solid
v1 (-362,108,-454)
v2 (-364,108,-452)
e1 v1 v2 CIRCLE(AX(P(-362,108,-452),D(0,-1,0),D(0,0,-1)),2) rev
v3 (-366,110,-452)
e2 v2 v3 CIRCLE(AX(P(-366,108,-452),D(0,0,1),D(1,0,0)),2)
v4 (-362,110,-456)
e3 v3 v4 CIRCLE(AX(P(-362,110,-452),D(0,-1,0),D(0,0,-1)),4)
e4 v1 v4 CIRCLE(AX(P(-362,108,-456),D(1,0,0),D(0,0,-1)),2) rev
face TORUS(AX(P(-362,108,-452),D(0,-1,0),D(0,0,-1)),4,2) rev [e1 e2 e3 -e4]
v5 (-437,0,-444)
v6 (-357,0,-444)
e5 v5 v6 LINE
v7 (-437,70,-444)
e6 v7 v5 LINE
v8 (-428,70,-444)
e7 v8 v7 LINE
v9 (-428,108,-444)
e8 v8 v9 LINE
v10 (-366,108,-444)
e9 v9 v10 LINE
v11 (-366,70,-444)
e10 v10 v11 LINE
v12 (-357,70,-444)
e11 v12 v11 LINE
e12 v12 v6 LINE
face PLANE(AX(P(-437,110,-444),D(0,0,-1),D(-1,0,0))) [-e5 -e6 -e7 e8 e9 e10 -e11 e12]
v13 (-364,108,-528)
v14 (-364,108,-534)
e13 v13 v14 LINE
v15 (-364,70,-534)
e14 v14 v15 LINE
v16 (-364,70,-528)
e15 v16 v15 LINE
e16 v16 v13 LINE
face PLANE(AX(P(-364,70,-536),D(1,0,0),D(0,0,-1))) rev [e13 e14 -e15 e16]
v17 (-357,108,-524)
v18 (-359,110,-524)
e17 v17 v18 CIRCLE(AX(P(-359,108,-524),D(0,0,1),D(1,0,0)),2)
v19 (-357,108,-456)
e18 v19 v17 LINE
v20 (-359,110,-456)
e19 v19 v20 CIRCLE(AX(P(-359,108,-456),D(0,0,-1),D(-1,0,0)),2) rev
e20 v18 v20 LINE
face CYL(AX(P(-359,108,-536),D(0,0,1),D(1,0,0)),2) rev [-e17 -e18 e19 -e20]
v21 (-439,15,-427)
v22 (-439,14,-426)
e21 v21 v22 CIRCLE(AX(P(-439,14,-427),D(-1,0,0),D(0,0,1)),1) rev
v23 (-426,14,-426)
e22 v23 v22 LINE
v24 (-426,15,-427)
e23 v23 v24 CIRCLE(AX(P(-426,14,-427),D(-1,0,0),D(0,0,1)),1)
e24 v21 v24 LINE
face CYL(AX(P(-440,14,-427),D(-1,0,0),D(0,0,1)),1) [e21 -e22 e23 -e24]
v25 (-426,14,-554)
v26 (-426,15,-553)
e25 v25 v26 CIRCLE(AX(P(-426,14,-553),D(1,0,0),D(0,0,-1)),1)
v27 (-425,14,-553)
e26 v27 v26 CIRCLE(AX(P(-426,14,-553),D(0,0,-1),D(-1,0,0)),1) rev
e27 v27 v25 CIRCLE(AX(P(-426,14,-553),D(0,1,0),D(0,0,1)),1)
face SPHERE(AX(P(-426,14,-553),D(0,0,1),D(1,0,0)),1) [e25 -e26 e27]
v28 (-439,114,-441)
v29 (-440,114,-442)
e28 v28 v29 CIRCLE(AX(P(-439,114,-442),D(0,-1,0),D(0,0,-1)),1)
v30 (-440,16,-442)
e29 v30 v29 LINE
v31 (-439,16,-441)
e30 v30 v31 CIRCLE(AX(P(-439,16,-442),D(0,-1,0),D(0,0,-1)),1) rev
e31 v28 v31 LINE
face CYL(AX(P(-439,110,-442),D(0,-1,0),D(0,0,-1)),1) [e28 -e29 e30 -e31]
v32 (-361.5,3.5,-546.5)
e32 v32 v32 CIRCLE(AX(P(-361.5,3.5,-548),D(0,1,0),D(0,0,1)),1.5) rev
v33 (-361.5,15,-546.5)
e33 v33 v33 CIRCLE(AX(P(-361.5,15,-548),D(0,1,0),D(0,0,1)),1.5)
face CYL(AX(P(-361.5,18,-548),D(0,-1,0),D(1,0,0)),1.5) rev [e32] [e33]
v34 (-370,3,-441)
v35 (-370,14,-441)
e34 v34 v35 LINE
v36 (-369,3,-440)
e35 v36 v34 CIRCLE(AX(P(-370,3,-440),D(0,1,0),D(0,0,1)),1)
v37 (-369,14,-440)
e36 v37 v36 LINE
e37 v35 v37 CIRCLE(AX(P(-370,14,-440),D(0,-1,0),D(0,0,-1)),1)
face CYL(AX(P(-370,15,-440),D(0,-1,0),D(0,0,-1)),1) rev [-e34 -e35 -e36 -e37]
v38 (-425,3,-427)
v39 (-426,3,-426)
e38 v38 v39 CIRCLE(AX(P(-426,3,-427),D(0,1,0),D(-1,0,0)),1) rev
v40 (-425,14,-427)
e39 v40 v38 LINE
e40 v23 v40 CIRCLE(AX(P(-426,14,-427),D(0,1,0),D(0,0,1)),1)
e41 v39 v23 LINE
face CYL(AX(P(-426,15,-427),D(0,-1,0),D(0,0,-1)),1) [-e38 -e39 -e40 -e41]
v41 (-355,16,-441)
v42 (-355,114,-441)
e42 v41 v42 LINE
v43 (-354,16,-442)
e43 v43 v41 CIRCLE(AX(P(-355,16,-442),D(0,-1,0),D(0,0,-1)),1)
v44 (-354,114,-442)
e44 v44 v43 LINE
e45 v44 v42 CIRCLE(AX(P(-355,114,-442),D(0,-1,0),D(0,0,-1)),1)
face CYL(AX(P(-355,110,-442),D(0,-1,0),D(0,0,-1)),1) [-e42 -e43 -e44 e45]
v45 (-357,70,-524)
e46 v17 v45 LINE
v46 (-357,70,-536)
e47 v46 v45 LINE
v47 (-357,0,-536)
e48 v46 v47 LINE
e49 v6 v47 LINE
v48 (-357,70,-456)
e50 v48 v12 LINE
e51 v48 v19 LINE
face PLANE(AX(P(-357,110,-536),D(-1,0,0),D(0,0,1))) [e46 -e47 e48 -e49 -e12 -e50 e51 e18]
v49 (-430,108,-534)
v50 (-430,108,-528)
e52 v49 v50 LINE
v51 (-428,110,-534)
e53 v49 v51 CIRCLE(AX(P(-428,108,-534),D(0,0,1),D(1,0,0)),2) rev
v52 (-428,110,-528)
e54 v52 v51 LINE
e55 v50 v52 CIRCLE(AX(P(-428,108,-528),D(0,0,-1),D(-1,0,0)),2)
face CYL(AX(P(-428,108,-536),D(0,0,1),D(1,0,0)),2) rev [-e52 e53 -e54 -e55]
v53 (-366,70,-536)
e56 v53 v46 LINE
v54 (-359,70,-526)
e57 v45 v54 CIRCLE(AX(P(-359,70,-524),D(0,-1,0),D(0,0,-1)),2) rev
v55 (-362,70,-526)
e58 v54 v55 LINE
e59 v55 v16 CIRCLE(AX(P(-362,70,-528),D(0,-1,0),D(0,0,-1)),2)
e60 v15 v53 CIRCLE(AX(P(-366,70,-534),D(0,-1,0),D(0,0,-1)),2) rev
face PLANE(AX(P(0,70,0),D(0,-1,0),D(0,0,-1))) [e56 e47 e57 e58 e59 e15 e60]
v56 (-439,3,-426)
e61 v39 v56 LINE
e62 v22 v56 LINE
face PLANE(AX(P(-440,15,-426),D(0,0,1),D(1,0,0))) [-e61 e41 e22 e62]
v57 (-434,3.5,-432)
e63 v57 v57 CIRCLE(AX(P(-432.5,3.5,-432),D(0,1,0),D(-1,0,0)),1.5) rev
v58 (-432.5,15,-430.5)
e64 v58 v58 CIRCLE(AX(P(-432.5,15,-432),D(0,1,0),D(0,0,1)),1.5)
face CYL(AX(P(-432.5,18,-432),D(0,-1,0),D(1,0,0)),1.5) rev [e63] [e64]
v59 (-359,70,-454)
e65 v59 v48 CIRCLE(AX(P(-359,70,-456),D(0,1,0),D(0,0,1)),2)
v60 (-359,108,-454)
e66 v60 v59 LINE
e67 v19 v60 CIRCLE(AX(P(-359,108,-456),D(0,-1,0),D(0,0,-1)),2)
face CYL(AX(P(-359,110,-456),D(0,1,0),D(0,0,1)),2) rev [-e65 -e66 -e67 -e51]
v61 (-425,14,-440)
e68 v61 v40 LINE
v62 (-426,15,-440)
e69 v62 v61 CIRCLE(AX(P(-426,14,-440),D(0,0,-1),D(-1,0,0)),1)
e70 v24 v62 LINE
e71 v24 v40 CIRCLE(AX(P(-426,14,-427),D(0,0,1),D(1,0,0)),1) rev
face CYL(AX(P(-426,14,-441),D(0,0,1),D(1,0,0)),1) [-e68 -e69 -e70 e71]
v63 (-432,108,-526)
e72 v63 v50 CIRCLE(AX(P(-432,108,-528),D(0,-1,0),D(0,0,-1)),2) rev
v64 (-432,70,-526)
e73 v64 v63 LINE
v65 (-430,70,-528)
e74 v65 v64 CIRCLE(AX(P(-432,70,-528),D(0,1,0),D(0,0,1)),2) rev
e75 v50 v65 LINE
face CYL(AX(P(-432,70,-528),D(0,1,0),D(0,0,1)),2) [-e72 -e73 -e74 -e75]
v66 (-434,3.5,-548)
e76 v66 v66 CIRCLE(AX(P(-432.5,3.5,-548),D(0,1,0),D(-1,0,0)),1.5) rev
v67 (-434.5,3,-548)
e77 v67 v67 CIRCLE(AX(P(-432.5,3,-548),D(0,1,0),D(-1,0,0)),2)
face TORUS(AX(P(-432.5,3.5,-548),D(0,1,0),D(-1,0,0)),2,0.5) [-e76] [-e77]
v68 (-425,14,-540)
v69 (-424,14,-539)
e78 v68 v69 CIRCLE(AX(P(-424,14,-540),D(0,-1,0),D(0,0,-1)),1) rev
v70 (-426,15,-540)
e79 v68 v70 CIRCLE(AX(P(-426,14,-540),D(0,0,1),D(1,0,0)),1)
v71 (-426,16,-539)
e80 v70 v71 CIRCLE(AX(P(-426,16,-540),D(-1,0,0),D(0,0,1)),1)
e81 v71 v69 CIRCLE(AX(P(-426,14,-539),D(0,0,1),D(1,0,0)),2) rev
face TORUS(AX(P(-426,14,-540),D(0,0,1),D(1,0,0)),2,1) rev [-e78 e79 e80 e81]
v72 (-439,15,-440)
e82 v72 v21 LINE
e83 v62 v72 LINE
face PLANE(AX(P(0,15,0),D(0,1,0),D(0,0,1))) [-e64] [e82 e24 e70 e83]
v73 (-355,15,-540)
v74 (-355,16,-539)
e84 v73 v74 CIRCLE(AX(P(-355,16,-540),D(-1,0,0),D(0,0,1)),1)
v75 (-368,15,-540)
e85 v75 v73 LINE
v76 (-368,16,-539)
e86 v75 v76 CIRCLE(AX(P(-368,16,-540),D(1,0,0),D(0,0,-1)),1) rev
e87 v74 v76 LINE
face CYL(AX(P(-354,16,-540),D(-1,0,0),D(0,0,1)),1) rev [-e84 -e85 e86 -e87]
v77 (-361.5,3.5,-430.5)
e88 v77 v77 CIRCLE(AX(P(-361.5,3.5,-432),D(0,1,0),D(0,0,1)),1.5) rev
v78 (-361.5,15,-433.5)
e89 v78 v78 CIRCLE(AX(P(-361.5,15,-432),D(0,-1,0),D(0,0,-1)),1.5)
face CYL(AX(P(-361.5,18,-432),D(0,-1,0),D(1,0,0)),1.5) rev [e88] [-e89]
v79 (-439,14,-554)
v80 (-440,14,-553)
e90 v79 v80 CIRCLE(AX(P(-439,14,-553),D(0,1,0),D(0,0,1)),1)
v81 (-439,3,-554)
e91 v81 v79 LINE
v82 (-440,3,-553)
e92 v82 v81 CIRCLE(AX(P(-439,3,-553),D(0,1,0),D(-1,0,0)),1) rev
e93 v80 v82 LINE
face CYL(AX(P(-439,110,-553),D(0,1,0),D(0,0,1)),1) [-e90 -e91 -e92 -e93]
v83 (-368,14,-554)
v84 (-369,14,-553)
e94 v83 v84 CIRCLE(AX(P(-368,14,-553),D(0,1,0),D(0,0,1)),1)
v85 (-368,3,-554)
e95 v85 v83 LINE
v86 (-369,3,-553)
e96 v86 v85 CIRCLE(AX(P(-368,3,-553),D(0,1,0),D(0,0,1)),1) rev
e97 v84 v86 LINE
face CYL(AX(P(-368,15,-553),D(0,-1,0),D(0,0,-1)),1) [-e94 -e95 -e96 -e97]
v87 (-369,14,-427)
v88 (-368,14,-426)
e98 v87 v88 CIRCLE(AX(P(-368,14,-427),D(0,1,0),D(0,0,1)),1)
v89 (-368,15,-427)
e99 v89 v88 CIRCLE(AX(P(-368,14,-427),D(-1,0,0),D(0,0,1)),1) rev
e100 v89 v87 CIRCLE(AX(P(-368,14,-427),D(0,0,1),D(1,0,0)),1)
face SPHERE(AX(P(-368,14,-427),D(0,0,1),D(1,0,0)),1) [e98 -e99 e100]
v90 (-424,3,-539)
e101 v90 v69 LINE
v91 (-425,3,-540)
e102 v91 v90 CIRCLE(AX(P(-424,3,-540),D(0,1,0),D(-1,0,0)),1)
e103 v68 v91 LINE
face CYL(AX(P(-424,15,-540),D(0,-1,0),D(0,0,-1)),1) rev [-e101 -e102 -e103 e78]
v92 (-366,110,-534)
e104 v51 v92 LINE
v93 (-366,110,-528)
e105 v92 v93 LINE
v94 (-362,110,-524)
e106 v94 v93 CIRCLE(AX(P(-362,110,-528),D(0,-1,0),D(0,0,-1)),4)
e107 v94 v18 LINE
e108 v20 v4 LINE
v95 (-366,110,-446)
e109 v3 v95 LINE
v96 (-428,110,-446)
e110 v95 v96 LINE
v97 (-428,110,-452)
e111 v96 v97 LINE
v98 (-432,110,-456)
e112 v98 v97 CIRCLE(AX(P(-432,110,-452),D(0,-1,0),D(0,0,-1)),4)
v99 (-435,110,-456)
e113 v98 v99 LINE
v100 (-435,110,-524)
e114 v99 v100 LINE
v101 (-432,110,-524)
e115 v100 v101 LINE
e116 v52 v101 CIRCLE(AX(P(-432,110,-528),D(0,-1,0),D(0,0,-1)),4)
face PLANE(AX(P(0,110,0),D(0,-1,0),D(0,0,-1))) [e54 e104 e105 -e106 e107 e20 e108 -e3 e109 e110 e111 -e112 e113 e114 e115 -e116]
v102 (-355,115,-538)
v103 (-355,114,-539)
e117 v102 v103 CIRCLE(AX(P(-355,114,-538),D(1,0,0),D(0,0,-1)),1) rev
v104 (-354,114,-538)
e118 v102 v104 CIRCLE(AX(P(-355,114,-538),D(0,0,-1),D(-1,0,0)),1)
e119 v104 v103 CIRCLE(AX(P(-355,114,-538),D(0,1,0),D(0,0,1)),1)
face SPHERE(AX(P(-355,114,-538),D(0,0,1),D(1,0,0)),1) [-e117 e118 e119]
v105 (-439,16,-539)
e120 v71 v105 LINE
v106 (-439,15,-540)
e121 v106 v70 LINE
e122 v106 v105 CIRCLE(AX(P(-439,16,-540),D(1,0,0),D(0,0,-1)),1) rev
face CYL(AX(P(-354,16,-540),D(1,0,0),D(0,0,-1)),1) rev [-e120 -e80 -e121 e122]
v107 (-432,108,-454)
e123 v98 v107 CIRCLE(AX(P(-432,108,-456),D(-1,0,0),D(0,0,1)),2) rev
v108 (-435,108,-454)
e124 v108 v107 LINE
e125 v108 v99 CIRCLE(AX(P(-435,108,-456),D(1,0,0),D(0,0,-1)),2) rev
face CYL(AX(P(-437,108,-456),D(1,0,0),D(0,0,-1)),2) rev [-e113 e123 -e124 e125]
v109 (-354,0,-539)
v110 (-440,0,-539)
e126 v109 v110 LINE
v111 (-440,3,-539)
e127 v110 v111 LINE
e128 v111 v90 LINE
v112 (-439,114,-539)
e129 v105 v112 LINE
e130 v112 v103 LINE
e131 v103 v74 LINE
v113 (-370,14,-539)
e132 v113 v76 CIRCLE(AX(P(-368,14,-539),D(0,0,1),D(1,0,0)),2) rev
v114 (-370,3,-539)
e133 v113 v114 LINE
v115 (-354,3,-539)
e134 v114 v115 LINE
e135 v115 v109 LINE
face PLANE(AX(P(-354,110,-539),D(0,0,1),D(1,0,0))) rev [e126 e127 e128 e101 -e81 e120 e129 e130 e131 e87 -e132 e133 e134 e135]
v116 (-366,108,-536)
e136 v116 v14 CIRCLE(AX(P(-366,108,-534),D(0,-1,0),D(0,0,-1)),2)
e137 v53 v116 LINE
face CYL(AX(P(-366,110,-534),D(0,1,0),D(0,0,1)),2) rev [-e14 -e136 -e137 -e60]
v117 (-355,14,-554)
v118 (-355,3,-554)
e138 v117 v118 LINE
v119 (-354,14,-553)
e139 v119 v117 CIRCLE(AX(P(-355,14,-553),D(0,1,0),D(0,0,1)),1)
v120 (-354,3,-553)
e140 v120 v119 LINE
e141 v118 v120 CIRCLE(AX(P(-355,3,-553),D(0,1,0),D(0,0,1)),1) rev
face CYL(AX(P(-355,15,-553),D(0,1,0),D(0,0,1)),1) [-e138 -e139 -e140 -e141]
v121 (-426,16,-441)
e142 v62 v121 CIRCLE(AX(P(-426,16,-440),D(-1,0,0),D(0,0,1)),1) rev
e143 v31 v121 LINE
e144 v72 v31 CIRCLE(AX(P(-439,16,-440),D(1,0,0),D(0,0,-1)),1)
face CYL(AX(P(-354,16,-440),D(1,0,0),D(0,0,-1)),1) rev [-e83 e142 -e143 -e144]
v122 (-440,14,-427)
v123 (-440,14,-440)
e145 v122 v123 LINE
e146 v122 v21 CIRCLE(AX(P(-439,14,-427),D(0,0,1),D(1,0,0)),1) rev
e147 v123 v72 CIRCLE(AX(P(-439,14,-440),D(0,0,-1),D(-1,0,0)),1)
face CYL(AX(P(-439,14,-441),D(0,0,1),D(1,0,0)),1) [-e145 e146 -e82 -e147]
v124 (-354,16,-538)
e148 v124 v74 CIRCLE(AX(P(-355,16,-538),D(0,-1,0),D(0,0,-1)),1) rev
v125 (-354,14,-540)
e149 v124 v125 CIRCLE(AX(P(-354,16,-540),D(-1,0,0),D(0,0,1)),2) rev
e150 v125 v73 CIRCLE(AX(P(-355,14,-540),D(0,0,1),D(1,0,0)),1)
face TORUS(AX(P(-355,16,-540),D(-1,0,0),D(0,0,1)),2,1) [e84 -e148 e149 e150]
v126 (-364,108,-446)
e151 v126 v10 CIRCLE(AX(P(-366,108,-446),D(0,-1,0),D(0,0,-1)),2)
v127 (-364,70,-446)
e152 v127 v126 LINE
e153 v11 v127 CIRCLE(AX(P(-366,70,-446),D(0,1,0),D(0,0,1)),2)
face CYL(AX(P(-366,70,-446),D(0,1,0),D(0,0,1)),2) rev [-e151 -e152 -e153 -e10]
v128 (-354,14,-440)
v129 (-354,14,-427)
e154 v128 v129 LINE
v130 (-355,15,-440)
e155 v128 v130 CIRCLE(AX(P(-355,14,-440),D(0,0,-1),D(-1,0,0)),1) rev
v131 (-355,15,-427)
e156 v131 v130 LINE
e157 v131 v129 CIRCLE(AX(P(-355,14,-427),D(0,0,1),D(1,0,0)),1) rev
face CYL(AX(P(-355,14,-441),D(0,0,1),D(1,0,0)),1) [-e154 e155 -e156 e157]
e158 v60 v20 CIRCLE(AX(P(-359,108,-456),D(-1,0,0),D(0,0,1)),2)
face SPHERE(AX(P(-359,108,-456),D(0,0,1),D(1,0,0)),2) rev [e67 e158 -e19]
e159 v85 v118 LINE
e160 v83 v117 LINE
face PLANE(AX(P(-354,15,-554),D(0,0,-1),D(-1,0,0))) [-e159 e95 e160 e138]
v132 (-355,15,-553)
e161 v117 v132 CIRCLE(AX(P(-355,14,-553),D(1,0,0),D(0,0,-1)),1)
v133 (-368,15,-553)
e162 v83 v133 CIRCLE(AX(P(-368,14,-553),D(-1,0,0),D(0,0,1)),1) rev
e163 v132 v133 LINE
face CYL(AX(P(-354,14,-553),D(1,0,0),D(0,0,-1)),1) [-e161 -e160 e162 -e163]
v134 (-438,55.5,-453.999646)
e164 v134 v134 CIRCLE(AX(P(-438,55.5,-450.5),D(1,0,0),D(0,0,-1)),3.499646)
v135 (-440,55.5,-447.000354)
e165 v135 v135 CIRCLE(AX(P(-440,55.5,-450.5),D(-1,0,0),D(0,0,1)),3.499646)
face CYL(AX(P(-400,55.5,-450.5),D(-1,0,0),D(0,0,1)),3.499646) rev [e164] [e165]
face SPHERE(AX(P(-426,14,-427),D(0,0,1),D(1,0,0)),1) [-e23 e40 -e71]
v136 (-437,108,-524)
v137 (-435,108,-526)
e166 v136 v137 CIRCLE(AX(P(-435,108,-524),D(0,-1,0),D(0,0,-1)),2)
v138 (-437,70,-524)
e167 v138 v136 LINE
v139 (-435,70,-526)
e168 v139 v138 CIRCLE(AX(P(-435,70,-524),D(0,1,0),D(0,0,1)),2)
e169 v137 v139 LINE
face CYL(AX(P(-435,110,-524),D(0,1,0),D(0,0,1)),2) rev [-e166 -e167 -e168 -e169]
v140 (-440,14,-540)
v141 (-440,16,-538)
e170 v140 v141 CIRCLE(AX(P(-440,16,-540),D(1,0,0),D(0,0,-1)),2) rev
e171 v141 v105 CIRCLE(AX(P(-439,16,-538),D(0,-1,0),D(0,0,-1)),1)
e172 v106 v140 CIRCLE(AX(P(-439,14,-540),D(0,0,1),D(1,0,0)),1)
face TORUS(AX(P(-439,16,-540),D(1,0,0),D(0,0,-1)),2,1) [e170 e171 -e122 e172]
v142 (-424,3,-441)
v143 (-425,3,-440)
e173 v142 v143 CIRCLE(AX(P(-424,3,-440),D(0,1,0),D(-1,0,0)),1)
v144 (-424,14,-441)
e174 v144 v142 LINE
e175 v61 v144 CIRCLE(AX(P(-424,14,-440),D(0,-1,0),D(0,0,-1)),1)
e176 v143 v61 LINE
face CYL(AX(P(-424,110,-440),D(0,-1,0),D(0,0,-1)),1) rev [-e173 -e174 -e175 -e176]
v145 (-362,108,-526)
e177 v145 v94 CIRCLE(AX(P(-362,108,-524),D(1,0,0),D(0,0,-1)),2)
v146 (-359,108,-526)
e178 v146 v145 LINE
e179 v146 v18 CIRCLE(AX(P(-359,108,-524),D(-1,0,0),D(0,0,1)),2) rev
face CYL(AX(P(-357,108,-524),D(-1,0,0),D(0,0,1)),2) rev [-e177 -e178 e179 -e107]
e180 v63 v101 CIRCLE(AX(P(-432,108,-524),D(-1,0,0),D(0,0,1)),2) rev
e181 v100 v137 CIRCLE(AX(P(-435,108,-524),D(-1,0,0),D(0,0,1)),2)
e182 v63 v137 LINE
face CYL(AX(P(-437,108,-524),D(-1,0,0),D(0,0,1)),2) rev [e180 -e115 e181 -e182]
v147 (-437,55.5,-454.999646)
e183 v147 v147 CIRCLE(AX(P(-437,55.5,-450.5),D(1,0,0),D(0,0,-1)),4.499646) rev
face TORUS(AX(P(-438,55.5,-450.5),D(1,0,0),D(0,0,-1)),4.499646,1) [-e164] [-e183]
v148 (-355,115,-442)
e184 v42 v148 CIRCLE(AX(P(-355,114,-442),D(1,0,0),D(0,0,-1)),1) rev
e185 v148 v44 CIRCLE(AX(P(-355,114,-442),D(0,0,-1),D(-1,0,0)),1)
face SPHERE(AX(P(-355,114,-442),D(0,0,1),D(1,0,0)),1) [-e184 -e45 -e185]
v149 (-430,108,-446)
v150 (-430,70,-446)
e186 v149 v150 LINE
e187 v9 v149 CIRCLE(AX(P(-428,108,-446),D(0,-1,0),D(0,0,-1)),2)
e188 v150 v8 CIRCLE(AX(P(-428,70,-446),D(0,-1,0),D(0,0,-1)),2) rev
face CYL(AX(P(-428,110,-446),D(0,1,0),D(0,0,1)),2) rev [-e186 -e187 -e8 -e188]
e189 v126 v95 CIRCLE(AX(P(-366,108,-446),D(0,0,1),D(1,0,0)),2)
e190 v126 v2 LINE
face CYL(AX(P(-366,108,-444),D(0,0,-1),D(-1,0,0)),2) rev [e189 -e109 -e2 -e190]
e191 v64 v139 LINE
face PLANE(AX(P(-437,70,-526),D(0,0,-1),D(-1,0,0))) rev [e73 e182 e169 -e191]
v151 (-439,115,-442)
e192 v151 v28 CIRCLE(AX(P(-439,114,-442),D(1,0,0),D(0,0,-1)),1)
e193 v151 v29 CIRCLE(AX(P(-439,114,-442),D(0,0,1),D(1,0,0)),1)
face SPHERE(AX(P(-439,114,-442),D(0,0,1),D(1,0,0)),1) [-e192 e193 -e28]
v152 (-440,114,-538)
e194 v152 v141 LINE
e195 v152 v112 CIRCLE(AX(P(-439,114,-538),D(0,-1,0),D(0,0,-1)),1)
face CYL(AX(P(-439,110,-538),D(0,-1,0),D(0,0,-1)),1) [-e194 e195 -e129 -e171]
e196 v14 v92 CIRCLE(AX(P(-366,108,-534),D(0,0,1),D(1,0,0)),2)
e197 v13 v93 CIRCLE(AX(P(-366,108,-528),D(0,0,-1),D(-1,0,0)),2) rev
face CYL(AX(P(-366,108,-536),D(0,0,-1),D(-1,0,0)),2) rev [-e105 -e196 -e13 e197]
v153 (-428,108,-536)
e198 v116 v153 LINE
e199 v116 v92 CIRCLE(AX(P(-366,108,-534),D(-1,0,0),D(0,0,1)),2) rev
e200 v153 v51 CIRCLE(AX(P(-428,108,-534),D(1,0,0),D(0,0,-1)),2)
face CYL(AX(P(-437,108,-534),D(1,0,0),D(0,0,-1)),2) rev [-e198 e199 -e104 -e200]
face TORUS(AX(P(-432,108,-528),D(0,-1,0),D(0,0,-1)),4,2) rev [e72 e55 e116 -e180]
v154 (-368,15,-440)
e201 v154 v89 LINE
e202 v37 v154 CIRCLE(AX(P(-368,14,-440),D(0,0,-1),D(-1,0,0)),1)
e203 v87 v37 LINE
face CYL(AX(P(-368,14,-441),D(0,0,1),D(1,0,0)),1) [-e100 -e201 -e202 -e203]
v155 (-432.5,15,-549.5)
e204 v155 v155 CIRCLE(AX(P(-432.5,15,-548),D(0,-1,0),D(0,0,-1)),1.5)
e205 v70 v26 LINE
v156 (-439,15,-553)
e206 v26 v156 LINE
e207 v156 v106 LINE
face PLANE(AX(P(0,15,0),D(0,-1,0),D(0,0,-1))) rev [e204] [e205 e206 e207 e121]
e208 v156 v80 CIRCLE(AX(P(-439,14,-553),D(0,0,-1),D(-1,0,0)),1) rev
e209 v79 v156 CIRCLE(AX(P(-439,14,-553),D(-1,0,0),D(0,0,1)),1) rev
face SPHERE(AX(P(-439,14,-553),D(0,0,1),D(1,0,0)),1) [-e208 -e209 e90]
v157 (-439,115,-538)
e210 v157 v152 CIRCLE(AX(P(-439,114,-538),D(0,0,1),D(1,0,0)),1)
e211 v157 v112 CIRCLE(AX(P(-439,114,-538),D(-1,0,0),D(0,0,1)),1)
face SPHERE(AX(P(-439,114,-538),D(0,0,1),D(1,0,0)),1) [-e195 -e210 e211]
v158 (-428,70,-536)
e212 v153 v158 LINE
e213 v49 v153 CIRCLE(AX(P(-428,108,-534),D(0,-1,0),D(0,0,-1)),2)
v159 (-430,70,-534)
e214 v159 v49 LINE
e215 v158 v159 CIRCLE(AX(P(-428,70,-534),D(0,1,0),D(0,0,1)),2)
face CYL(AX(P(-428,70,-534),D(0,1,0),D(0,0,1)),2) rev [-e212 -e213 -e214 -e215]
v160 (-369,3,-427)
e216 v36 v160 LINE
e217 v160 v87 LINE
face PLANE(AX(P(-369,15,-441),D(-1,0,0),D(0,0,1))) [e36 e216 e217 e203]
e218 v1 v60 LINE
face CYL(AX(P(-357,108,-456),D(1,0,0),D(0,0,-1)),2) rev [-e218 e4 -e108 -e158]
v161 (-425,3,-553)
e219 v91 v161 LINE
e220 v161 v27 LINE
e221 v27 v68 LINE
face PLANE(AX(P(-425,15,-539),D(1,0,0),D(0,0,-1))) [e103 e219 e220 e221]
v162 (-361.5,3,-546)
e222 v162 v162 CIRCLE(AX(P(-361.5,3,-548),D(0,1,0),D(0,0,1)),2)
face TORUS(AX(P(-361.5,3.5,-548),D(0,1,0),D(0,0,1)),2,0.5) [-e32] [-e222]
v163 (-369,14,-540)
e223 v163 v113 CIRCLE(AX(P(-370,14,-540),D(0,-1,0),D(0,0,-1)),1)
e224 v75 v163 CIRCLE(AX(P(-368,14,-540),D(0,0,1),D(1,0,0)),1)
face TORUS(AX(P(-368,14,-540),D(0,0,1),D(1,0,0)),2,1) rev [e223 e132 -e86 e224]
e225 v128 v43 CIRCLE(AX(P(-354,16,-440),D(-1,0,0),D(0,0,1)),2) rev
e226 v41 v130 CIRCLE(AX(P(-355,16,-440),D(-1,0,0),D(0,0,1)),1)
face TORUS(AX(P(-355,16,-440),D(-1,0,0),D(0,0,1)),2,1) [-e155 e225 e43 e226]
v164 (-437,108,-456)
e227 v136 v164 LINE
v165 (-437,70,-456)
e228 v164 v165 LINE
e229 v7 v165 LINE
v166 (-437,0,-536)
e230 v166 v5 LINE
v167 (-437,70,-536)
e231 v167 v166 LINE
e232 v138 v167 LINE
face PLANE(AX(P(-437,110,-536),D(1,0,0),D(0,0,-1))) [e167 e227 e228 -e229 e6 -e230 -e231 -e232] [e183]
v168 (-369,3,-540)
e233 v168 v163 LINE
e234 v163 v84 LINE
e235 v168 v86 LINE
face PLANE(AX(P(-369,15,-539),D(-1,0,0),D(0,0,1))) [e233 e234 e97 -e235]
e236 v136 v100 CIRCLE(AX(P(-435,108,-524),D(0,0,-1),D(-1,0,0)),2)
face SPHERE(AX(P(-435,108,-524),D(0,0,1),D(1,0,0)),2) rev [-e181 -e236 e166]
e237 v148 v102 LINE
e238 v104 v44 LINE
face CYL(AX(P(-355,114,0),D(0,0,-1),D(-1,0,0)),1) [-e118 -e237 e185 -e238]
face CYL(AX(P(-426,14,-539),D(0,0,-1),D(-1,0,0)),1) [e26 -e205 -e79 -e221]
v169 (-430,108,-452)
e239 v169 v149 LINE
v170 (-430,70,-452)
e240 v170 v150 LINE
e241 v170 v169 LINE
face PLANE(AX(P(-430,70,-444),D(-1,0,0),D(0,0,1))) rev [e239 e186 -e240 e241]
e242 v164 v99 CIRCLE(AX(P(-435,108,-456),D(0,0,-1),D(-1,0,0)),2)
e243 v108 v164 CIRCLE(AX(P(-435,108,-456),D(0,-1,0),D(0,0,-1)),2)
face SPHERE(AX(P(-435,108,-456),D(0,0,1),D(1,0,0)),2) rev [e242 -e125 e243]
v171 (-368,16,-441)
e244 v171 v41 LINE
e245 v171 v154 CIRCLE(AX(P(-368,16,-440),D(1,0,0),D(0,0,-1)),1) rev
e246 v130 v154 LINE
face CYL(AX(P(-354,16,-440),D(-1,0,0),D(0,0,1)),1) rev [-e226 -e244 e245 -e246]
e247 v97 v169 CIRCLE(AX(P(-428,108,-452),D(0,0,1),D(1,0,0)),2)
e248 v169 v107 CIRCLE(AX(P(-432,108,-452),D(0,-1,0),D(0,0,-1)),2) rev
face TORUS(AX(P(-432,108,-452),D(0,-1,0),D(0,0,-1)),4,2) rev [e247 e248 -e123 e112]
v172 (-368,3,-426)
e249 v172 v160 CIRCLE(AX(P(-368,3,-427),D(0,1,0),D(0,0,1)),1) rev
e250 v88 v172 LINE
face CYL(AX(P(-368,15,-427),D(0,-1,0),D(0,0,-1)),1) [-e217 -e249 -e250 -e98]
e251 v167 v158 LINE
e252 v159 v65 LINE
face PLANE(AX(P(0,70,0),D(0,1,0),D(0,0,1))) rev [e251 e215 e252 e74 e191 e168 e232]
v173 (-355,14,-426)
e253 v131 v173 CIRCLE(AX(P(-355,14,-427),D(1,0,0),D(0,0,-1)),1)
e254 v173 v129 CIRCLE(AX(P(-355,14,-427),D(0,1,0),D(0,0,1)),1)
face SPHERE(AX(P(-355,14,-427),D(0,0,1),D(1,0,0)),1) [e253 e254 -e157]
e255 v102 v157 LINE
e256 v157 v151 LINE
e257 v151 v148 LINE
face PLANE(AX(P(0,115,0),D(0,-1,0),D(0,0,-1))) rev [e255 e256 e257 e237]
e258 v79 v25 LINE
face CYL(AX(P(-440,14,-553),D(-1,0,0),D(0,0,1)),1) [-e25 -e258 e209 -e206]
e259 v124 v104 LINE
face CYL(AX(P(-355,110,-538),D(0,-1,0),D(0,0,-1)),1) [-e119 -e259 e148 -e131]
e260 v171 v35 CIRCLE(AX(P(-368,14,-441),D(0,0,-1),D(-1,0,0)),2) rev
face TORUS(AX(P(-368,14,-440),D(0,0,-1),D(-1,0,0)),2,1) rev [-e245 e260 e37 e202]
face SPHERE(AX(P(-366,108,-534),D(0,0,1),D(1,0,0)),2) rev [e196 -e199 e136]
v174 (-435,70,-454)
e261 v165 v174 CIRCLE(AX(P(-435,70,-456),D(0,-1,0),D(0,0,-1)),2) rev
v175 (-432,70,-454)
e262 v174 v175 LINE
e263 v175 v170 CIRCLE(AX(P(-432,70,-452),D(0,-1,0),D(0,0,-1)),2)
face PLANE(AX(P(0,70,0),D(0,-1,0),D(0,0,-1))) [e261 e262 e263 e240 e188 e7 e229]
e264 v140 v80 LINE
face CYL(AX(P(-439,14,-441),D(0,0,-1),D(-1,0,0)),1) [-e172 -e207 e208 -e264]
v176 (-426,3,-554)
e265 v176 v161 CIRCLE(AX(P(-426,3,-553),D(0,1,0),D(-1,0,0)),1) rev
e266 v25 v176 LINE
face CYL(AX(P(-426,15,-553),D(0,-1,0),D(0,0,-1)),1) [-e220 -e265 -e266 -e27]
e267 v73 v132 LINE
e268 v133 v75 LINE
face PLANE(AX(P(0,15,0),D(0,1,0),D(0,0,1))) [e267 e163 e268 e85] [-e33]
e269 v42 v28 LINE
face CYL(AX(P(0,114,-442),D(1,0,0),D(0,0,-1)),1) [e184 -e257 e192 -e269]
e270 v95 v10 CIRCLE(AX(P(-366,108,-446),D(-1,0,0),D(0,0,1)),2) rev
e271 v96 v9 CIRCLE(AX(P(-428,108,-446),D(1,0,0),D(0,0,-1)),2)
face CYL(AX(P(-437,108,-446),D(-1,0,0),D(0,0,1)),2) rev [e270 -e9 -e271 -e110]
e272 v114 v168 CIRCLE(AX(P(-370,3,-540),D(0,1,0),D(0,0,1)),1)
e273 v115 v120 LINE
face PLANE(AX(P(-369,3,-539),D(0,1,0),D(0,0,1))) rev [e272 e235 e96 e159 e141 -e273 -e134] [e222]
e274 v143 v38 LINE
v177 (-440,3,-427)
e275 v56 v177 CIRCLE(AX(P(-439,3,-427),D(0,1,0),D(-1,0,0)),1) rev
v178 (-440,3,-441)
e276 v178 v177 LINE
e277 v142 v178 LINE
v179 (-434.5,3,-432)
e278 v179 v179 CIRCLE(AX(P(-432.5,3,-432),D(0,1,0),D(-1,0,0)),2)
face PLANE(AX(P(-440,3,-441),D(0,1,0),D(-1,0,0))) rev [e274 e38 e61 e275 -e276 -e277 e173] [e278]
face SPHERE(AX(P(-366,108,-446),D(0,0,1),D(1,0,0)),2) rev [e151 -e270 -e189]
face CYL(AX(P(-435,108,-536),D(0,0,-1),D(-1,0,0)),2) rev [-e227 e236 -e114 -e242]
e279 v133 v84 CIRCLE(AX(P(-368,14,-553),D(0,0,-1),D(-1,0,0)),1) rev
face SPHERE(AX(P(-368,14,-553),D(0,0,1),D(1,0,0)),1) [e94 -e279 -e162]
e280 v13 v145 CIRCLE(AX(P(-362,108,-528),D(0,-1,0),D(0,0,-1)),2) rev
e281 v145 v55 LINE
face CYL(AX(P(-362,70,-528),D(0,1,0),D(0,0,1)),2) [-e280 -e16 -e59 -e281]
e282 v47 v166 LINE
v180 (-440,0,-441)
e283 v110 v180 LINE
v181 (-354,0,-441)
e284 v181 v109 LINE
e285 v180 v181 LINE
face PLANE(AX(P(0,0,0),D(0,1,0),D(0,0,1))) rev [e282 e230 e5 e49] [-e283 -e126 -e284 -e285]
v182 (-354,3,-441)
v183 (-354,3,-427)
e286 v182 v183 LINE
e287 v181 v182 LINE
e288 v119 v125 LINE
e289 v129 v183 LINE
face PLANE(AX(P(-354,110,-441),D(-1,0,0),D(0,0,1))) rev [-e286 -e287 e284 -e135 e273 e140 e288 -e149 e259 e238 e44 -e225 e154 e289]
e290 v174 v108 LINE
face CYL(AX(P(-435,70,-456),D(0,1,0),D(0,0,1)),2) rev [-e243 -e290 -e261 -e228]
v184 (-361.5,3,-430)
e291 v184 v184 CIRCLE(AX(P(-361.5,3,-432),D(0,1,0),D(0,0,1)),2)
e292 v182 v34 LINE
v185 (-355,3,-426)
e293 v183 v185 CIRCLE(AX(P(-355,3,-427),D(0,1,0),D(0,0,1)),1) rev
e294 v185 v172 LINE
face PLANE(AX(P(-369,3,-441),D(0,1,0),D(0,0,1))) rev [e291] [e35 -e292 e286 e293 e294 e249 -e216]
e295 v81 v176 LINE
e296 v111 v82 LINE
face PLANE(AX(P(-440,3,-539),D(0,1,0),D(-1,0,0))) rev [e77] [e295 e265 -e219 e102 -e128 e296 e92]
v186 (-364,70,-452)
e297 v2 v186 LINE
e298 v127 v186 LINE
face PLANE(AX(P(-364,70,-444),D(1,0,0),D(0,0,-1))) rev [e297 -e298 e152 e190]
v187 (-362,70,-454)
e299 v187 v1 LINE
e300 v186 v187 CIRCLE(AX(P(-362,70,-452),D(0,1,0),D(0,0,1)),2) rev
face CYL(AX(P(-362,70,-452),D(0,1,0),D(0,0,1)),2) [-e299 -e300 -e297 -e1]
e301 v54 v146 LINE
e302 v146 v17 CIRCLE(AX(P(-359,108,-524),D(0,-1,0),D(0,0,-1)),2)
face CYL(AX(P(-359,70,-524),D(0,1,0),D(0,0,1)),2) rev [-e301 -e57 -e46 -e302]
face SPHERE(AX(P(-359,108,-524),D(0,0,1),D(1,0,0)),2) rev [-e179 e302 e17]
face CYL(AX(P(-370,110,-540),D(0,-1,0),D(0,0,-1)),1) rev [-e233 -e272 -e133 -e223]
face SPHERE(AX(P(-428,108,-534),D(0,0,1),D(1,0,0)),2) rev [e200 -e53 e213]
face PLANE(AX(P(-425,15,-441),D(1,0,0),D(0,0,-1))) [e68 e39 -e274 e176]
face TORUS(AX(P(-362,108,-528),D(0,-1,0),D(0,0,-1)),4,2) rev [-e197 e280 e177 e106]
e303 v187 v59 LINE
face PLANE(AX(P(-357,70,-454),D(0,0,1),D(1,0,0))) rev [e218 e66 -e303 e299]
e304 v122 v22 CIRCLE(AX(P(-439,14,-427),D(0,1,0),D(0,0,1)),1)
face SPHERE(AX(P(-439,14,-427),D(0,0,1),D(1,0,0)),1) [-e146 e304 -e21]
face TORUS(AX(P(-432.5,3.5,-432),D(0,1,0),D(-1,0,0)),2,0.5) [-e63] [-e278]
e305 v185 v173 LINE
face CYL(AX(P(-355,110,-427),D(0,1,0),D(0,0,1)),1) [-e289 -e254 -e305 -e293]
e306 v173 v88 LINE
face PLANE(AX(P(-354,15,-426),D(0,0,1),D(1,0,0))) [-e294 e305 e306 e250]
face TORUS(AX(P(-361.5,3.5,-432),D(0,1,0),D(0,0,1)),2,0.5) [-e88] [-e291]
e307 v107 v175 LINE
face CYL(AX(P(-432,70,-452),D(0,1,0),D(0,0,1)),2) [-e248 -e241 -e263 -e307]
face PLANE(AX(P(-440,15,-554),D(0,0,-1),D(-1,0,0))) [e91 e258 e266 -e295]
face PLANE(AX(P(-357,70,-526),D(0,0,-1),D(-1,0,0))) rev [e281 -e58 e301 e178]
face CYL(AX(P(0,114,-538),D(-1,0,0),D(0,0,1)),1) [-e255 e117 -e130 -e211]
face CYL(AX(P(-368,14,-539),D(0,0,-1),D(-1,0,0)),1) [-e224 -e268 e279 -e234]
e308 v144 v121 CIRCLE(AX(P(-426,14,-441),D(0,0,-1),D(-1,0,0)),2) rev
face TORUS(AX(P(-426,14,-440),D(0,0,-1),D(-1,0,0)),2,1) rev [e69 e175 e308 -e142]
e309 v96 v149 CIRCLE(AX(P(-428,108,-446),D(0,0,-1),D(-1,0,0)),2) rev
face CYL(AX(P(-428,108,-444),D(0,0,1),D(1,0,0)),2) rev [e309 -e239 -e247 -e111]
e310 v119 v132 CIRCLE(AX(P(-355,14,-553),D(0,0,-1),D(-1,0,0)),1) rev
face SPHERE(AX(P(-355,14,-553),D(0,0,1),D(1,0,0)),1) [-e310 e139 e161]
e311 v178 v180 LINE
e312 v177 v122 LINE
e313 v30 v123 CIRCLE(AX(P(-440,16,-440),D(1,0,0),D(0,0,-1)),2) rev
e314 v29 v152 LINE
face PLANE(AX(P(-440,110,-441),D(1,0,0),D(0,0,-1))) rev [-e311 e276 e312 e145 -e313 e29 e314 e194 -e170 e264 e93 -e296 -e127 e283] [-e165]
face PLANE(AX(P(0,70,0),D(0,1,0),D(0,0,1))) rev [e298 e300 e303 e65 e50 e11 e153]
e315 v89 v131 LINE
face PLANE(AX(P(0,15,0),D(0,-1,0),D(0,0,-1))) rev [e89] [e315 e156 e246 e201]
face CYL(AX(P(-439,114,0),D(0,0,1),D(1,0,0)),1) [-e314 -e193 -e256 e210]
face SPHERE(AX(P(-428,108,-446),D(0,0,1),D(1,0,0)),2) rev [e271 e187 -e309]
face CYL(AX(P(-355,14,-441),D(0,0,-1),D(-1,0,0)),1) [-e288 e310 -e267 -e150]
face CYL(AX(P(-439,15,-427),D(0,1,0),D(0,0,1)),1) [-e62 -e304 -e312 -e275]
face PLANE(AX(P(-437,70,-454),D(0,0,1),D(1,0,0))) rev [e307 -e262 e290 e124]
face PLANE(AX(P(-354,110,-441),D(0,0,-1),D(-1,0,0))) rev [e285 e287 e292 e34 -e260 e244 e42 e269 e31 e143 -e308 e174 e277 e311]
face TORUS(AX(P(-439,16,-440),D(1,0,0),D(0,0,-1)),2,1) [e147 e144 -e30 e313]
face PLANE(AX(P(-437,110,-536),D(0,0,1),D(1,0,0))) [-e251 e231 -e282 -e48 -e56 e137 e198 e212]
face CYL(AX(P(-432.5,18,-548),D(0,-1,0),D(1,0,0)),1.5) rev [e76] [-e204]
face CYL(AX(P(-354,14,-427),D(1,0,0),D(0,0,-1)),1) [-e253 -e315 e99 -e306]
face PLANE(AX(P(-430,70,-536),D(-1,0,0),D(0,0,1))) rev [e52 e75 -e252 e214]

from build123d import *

# Parameters (mm, degrees)
ESBO_O1_W                = 86
ESBO_O1_H                = 98
ESBO_O1_W_2              = 80
ESBO_O1_H_2              = 92
RESSALTO_EXTRUS_O1_DEPTH = 110
ESBO_O2_W                = 86
ESBO_O2_H                = 98
RESSALTO_EXTRUS_O2_DEPTH = 5
ESBO_O3_W                = 7
ESBO_O3_H                = 10
RESSALTO_EXTRUS_O3_DEPTH = 40
ESBO_O4_R                = 3.499646081
CORTE_EXTRUS_O1_DEPTH    = 40
FILETE1_R                = 1
FILETE2_R                = 2
FILETE3_R                = 2
ESBO_O5_W                = 15
ESBO_O5_H                = 15
RESSALTO_EXTRUS_O4_DEPTH = 15
ESBO_O7_W                = 15
ESBO_O7_H                = 3
CORTE_EXTRUS_O2_DEPTH    = 15
ESBO_O8_W                = 15
ESBO_O8_H                = 3
CORTE_EXTRUS_O3_DEPTH    = 15
FILETE4_R                = 1
FILETE5_R                = 1
FILETE6_R                = 1
FILETE7_R                = 1
ESBO_O9_R                = 1.5
CORTE_EXTRUS_O4_DEPTH    = 15
FILETE8_R                = 0.5


with BuildPart() as part:
    # Esboço1 → Ressalto-extrusão1 (new body)
    with BuildSketch(Plane(origin=(0, 0, 0), x_dir=(1, 0, 0), z_dir=(0, 1, 0))):
        with Locations((-397, 490)):
            Rectangle(ESBO_O1_W, ESBO_O1_H)
        with Locations((-397, 490)):
            Rectangle(ESBO_O1_W_2, ESBO_O1_H_2, mode=Mode.SUBTRACT)
    extrude(amount=RESSALTO_EXTRUS_O1_DEPTH)

    # Esboço2 → Ressalto-extrusão2 (add)
    with BuildSketch(Plane(origin=(0, 110, 0), x_dir=(1, 0, 0), z_dir=(0, 1, 0))):
        with Locations((-397, 490)):
            Rectangle(ESBO_O2_W, ESBO_O2_H)
    extrude(amount=RESSALTO_EXTRUS_O2_DEPTH)

    # Esboço3 → Ressalto-extrusão3 (add)
    with BuildSketch(Plane.XZ.offset(-110)):
        with Locations((-433.5, -449)):
            Rectangle(ESBO_O3_W, ESBO_O3_H)
        with Locations((-360.5, -449)):
            Rectangle(ESBO_O3_W, ESBO_O3_H)
        with Locations((-360.5, -531)):
            Rectangle(ESBO_O3_W, ESBO_O3_H)
        with Locations((-433.5, -531)):
            Rectangle(ESBO_O3_W, ESBO_O3_H)
    extrude(amount=RESSALTO_EXTRUS_O3_DEPTH)

    # Esboço4 → Corte-extrusão1 (cut)
    with BuildSketch(Plane.ZY.offset(440)):
        with Locations((-450.5, 55.5)):
            Circle(ESBO_O4_R)
    extrude(amount=-CORTE_EXTRUS_O1_DEPTH, mode=Mode.SUBTRACT)

    # Filete1
    filete1_edges = [part.edges().sort_by_distance(p)[0] for p in [
        (-437, 55.5, -453.999646081),
    ]]
    fillet(filete1_edges, radius=FILETE1_R)

    # Filete2
    filete2_edges = [part.edges().sort_by_distance(p)[0] for p in [
        (-397, 110, -444),
        (-433.5, 110, -454),
        (-437, 90, -454),
        (-430, 110, -449),
        (-430, 90, -454),
        (-430, 90, -444),
        (-437, 110, -490),
    ]]
    fillet(filete2_edges, radius=FILETE2_R)

    # Filete3
    filete3_edges = [part.edges().sort_by_distance(p)[0] for p in [
        (-364, 110, -450),
        (-436.414213562, 109.414213562, -526),
        (-364, 109.414213562, -444.585786438),
        (-357, 110, -490),
        (-357, 90, -454),
        (-364, 89, -444),
        (-360.5, 110, -454),
        (-364, 90, -454),
        (-397, 110, -536),
        (-360.5, 110, -526),
        (-357, 90, -526),
        (-364, 110, -531),
        (-364, 90, -526),
        (-364, 90, -536),
        (-437, 89, -526),
        (-430, 110, -531),
        (-430, 90, -536),
        (-432.5, 110, -526),
        (-430, 90, -526),
    ]]
    fillet(filete3_edges, radius=FILETE3_R)

    # Esboço5 → Ressalto-extrusão4 (add)
    with BuildSketch(Plane.XZ):
        with Locations((-432.5, -433.5)):
            Rectangle(ESBO_O5_W, ESBO_O5_H)
        with Locations((-361.5, -433.5)):
            Rectangle(ESBO_O5_W, ESBO_O5_H)
        with Locations((-432.5, -546.5)):
            Rectangle(ESBO_O5_W, ESBO_O5_H)
        with Locations((-361.5, -546.5)):
            Rectangle(ESBO_O5_W, ESBO_O5_H)
    extrude(amount=-RESSALTO_EXTRUS_O4_DEPTH)

    # Esboço7 → Corte-extrusão2 (cut)
    with BuildSketch(Plane(origin=(0, 0, -554), x_dir=(-1, 0, 0), z_dir=(0, 0, -1))):
        with Locations((432.5, 1.5)):
            Rectangle(ESBO_O7_W, ESBO_O7_H)
        with Locations((361.5, 1.5)):
            Rectangle(ESBO_O7_W, ESBO_O7_H)
    extrude(amount=-CORTE_EXTRUS_O2_DEPTH, mode=Mode.SUBTRACT)

    # Esboço8 → Corte-extrusão3 (cut)
    with BuildSketch(Plane.XY.offset(-426)):
        with Locations((-432.5, 1.5)):
            Rectangle(ESBO_O8_W, ESBO_O8_H)
        with Locations((-361.5, 1.5)):
            Rectangle(ESBO_O8_W, ESBO_O8_H)
    extrude(amount=-CORTE_EXTRUS_O3_DEPTH, mode=Mode.SUBTRACT)

    # Filete4
    filete4_edges = [part.edges().sort_by_distance(p)[0] for p in [
        (-440, 15, -433.5),
        (-432.5, 15, -426),
        (-425, 15, -433.5),
        (-432.5, 15, -441),
        (-425, 9, -441),
        (-440, 65, -441),
    ]]
    fillet(filete4_edges, radius=FILETE4_R)

    # Filete5
    # the kernel refuses this fillet: 1 mm, written as the material it takes off along each edge
    with BuildSketch(Plane(origin=(-426, 14, -427), x_dir=(0, 0, 1), z_dir=(1, 0, 0))) as filete5_piece_1_section:
        Polygon((0, 0), (FILETE5_R, 0), (FILETE5_R, -FILETE5_R), (0, -FILETE5_R), align=None)
    filete5_piece_1 = extrude(amount=FILETE5_R, mode=Mode.PRIVATE)
    filete5_piece_1 = filete5_piece_1 - Plane(origin=(-426, 14, -427), x_dir=(0, -0.7071067811865475, -0.7071067811865475), z_dir=(1, 0, 0)) * Sphere(FILETE5_R, mode=Mode.PRIVATE)
    add(filete5_piece_1, mode=Mode.SUBTRACT)
    with BuildSketch(Plane(origin=(-439, 14, -427), x_dir=(0, 0, 1), z_dir=(-1, 0, 0))) as filete5_piece_2_section:
        Polygon((0, 0), (FILETE5_R, 0), (FILETE5_R, FILETE5_R), (0, FILETE5_R), align=None)
    filete5_piece_2 = extrude(amount=FILETE5_R, mode=Mode.PRIVATE)
    filete5_piece_2 = filete5_piece_2 - Plane(origin=(-439, 14, -427), x_dir=(0, -0.7071067811865475, -0.7071067811865475), z_dir=(-1, 0, 0)) * Sphere(FILETE5_R, mode=Mode.PRIVATE)
    add(filete5_piece_2, mode=Mode.SUBTRACT)
    with BuildSketch(Plane(origin=(-440, 0.5, -426), x_dir=(0, 0, -1), z_dir=(0, 1, 0))) as filete5_piece_3:
        with BuildLine():
            CenterArc((FILETE5_R, -FILETE5_R), FILETE5_R, 90, 90)
            Line((0, -FILETE5_R), (0, 0))
            Line((0, 0), (FILETE5_R, 0))
        make_face()
    extrude(amount=13.5, mode=Mode.SUBTRACT)
    with BuildSketch(Plane(origin=(-425, 0.5, -426), x_dir=(0, 0, -1), z_dir=(0, 1, 0))) as filete5_piece_4:
        with BuildLine():
            CenterArc((FILETE5_R, FILETE5_R), FILETE5_R, 180, 90)
            Line((0, FILETE5_R), (0, 0))
            Line((0, 0), (FILETE5_R, 0))
        make_face()
    extrude(amount=13.5, mode=Mode.SUBTRACT)

    # Filete6
    filete6_edges = [part.edges().sort_by_distance(p)[0] for p in [
        (-354, 15, -433.5),
        (-361.5, 15, -441),
        (-440, 115, -490.5),
        (-439.707106781, 115, -441.292893219),
        (-396.5, 115, -441),
        (-354, 65, -441),
        (-361.5, 15, -426),
        (-369, 15, -433.5),
        (-354, 9, -426),
        (-369, 9, -426),
        (-369, 9, -441),
    ]]
    fillet(filete6_edges, radius=FILETE6_R)

    # Filete7
    # the kernel refuses this fillet: 1 mm, written as the material it takes off along each edge
    with BuildSketch(Plane(origin=(-355, 114, -442), x_dir=(1, 0, 0), z_dir=(0, 1, 0))) as filete7_piece_1_section:
        Polygon((0, 0), (FILETE7_R, 0), (FILETE7_R, -FILETE7_R), (0, -FILETE7_R), align=None)
    filete7_piece_1 = extrude(amount=FILETE7_R, mode=Mode.PRIVATE)
    filete7_piece_1 = filete7_piece_1 - Plane(origin=(-355, 114, -442), x_dir=(-0.7071067811865475, 0, -0.7071067811865475), z_dir=(0, 1, 0)) * Sphere(FILETE7_R, mode=Mode.PRIVATE)
    add(filete7_piece_1, mode=Mode.SUBTRACT)
    with BuildSketch(Plane(origin=(-426, 14, -553), x_dir=(0, 0, -1), z_dir=(1, 0, 0))) as filete7_piece_2_section:
        Polygon((0, 0), (FILETE7_R, 0), (FILETE7_R, FILETE7_R), (0, FILETE7_R), align=None)
    filete7_piece_2 = extrude(amount=FILETE7_R, mode=Mode.PRIVATE)
    filete7_piece_2 = filete7_piece_2 - Plane(origin=(-426, 14, -553), x_dir=(0, -0.7071067811865475, 0.7071067811865475), z_dir=(1, 0, 0)) * Sphere(FILETE7_R, mode=Mode.PRIVATE)
    add(filete7_piece_2, mode=Mode.SUBTRACT)
    with BuildSketch(Plane(origin=(-368, 14, -553), x_dir=(-1, 0, 0), z_dir=(0, 1, 0))) as filete7_piece_3_section:
        Polygon((0, 0), (FILETE7_R, 0), (FILETE7_R, -FILETE7_R), (0, -FILETE7_R), align=None)
    filete7_piece_3 = extrude(amount=FILETE7_R, mode=Mode.PRIVATE)
    filete7_piece_3 = filete7_piece_3 - Plane(origin=(-368, 14, -553), x_dir=(0.7071067811865475, 0, 0.7071067811865475), z_dir=(0, 1, 0)) * Sphere(FILETE7_R, mode=Mode.PRIVATE)
    add(filete7_piece_3, mode=Mode.SUBTRACT)
    with BuildSketch(Plane(origin=(-440, 0.5, -554), x_dir=(0, 0, 1), z_dir=(0, 1, 0))) as filete7_piece_4:
        with BuildLine():
            CenterArc((FILETE7_R, FILETE7_R), FILETE7_R, 180, 90)
            Line((0, FILETE7_R), (0, 0))
            Line((0, 0), (FILETE7_R, 0))
        make_face()
    extrude(amount=17, mode=Mode.SUBTRACT)
    with BuildSketch(Plane(origin=(-425, 15, -539), x_dir=(0, -1, 0), z_dir=(0, 0, -1)), Plane(origin=(-369, 15, -539), x_dir=(1, 0, 0), z_dir=(0, 0, -1))) as filete7_piece_5:
        with BuildLine():
            CenterArc((FILETE7_R, FILETE7_R), FILETE7_R, 180, 90)
            Line((0, FILETE7_R), (0, 0))
            Line((0, 0), (FILETE7_R, 0))
        make_face()
    extrude(amount=14, mode=Mode.SUBTRACT)
    with BuildSketch(Plane(origin=(-426, 15, -554), x_dir=(0, -1, 0), z_dir=(-1, 0, 0)), Plane(origin=(-368, 15, -554), x_dir=(0, 0, 1), z_dir=(1, 0, 0))) as filete7_piece_6:
        with BuildLine():
            CenterArc((FILETE7_R, FILETE7_R), FILETE7_R, 180, 90)
            Line((0, FILETE7_R), (0, 0))
            Line((0, 0), (FILETE7_R, 0))
        make_face()
    extrude(amount=16.5, mode=Mode.SUBTRACT)
    with BuildSketch(Plane(origin=(-425, 0.5, -554), x_dir=(0, 0, 1), z_dir=(0, 1, 0))) as filete7_piece_7:
        with BuildLine():
            CenterArc((FILETE7_R, -FILETE7_R), FILETE7_R, 90, 90)
            Line((0, -FILETE7_R), (0, 0))
            Line((0, 0), (FILETE7_R, 0))
        make_face()
    extrude(amount=13.5, mode=Mode.SUBTRACT)
    with BuildSketch(Plane(origin=(-354, 0.5, -554), x_dir=(0, 0, 1), z_dir=(0, 1, 0))) as filete7_piece_8:
        with BuildLine():
            CenterArc((FILETE7_R, -FILETE7_R), FILETE7_R, 90, 90)
            Line((0, -FILETE7_R), (0, 0))
            Line((0, 0), (FILETE7_R, 0))
        make_face()
    extrude(amount=17, mode=Mode.SUBTRACT)
    with BuildSketch(Plane(origin=(-369, 0.5, -554), x_dir=(0, 0, 1), z_dir=(0, 1, 0))) as filete7_piece_9:
        with BuildLine():
            CenterArc((FILETE7_R, FILETE7_R), FILETE7_R, 180, 90)
            Line((0, FILETE7_R), (0, 0))
            Line((0, 0), (FILETE7_R, 0))
        make_face()
    extrude(amount=13.5, mode=Mode.SUBTRACT)
    with BuildSketch(Plane(origin=(-354, 115, -442), x_dir=(-1, 0, 0), z_dir=(0, 0, -1))) as filete7_piece_10:
        with BuildLine():
            CenterArc((FILETE7_R, -FILETE7_R), FILETE7_R, 90, 90)
            Line((0, -FILETE7_R), (0, 0))
            Line((0, 0), (FILETE7_R, 0))
        make_face()
    extrude(amount=99.5, mode=Mode.SUBTRACT)
    # the kernel refuses this fillet: 1 mm, written as the material it adds along each edge
    with BuildSketch(Plane(origin=(-440, 15, -539), x_dir=(0, 1, 0), z_dir=(1, 0, 0))) as filete7_2_piece_1:
        with BuildLine():
            CenterArc((FILETE7_R, -FILETE7_R), FILETE7_R, 90, 90)
            Line((0, -FILETE7_R), (0, 0))
            Line((0, 0), (FILETE7_R, 0))
        make_face()
    extrude(amount=14)
    with BuildSketch(Plane(origin=(-425, 3, -539), x_dir=(1, 0, 0), z_dir=(0, 1, 0))) as filete7_2_piece_2:
        with BuildLine():
            CenterArc((FILETE7_R, FILETE7_R), FILETE7_R, 180, 90)
            Line((0, FILETE7_R), (0, 0))
            Line((0, 0), (FILETE7_R, 0))
        make_face()
    extrude(amount=11)
    with BuildSketch(Plane(origin=(-354, 15, -539), x_dir=(0, 1, 0), z_dir=(-1, 0, 0))) as filete7_2_piece_3:
        with BuildLine():
            CenterArc((FILETE7_R, FILETE7_R), FILETE7_R, 180, 90)
            Line((0, FILETE7_R), (0, 0))
            Line((0, 0), (FILETE7_R, 0))
        make_face()
    extrude(amount=14)
    with BuildSketch(Plane(origin=(-369, 3, -539), x_dir=(-1, 0, 0), z_dir=(0, 1, 0))) as filete7_2_piece_4:
        with BuildLine():
            CenterArc((FILETE7_R, -FILETE7_R), FILETE7_R, 90, 90)
            Line((0, -FILETE7_R), (0, 0))
            Line((0, 0), (FILETE7_R, 0))
        make_face()
    extrude(amount=11)
    with BuildSketch(Plane(origin=(-368, 14, -539), x_dir=(0, 1, 0), z_dir=(1, 0, 0))) as filete7_2_piece_5:
        with BuildLine():
            CenterArc((1 + FILETE7_R, -FILETE7_R), FILETE7_R, 90, 90)
            Line((1, -FILETE7_R), (1, 0))
            Line((1, 0), (1 + FILETE7_R, 0))
        make_face()
    revolve(axis=Axis((-368, 14, -539), (0, 0, 1)), revolution_arc=90)
    with BuildSketch(Plane(origin=(-426, 14, -539), x_dir=(1, 0, 0), z_dir=(0, -1, 0))) as filete7_2_piece_6:
        with BuildLine():
            CenterArc((1 + FILETE7_R, -FILETE7_R), FILETE7_R, 90, 90)
            Line((1, -FILETE7_R), (1, 0))
            Line((1, 0), (1 + FILETE7_R, 0))
        make_face()
    revolve(axis=Axis((-426, 14, -539), (0, 0, 1)), revolution_arc=90)
    # the kernel refuses this fillet: 1 mm, written as the material it takes off along each edge
    with BuildSketch(Plane(origin=(-355, 14, -553), x_dir=(0, 1, 0), z_dir=(1, 0, 0))) as filete7_3_piece_1_section:
        Polygon((0, 0), (FILETE7_R, 0), (FILETE7_R, -FILETE7_R), (0, -FILETE7_R), align=None)
    filete7_3_piece_1 = extrude(amount=FILETE7_R, mode=Mode.PRIVATE)
    filete7_3_piece_1 = filete7_3_piece_1 - Plane(origin=(-355, 14, -553), x_dir=(0, -0.7071067811865475, 0.7071067811865475), z_dir=(1, 0, 0)) * Sphere(FILETE7_R, mode=Mode.PRIVATE)
    add(filete7_3_piece_1, mode=Mode.SUBTRACT)
    with BuildSketch(Plane(origin=(-439, 14, -553), x_dir=(0, 1, 0), z_dir=(-1, 0, 0))) as filete7_3_piece_2_section:
        Polygon((0, 0), (FILETE7_R, 0), (FILETE7_R, FILETE7_R), (0, FILETE7_R), align=None)
    filete7_3_piece_2 = extrude(amount=FILETE7_R, mode=Mode.PRIVATE)
    filete7_3_piece_2 = filete7_3_piece_2 - Plane(origin=(-439, 14, -553), x_dir=(0, -0.7071067811865475, 0.7071067811865475), z_dir=(-1, 0, 0)) * Sphere(FILETE7_R, mode=Mode.PRIVATE)
    add(filete7_3_piece_2, mode=Mode.SUBTRACT)
    with BuildSketch(Plane(origin=(-440, 15, -553), x_dir=(0, -1, 0), z_dir=(0, 0, 1))) as filete7_3_piece_3:
        with BuildLine():
            CenterArc((FILETE7_R, FILETE7_R), FILETE7_R, 180, 90)
            Line((0, FILETE7_R), (0, 0))
            Line((0, 0), (FILETE7_R, 0))
        make_face()
    extrude(amount=13, mode=Mode.SUBTRACT)
    with BuildSketch(Plane(origin=(-354, 15, -553), x_dir=(0, -1, 0), z_dir=(0, 0, 1))) as filete7_3_piece_4:
        with BuildLine():
            CenterArc((FILETE7_R, -FILETE7_R), FILETE7_R, 90, 90)
            Line((0, -FILETE7_R), (0, 0))
            Line((0, 0), (FILETE7_R, 0))
        make_face()
    extrude(amount=13, mode=Mode.SUBTRACT)
    with BuildSketch(Plane(origin=(-355, 115, -539), x_dir=(0, 0, 1), z_dir=(-1, 0, 0))) as filete7_3_piece_5:
        with BuildLine():
            CenterArc((FILETE7_R, -FILETE7_R), FILETE7_R, 90, 90)
            Line((0, -FILETE7_R), (0, 0))
            Line((0, 0), (FILETE7_R, 0))
        make_face()
    extrude(amount=84, mode=Mode.SUBTRACT)
    with BuildSketch(Plane(origin=(-440, 114, -539), x_dir=(0, 0, 1), z_dir=(0, -1, 0)), Plane(origin=(-354, 16, -539), x_dir=(0, 0, 1), z_dir=(0, 1, 0))) as filete7_3_piece_6:
        with BuildLine():
            CenterArc((FILETE7_R, -FILETE7_R), FILETE7_R, 90, 90)
            Line((0, -FILETE7_R), (0, 0))
            Line((0, 0), (FILETE7_R, 0))
        make_face()
    extrude(amount=98, mode=Mode.SUBTRACT)
    with BuildSketch(Plane(origin=(-439, 114, -539), x_dir=(-1, 0, 0), z_dir=(0, -1, 0))) as filete7_3_piece_7:
        with BuildLine():
            CenterArc((1 - FILETE7_R, -FILETE7_R), FILETE7_R, 0, 90)
            Line((1, -FILETE7_R), (1, 0))
            Line((1, 0), (1 - FILETE7_R, 0))
        make_face()
    revolve(axis=Axis((-439, 114, -539), (0, 0, -1)), revolution_arc=90, mode=Mode.SUBTRACT)
    with BuildSketch(Plane(origin=(-354, 16, -540), x_dir=(0, 0, 1), z_dir=(0, 1, 0))) as filete7_3_piece_8:
        with BuildLine():
            CenterArc((1 + FILETE7_R, -FILETE7_R), FILETE7_R, 90, 90)
            Line((1, -FILETE7_R), (1, 0))
            Line((1, 0), (1 + FILETE7_R, 0))
        make_face()
    revolve(axis=Axis((-354, 16, -540), (1, 0, 0)), revolution_arc=90, mode=Mode.SUBTRACT)
    with BuildSketch(Plane(origin=(-355, 114, -539), x_dir=(1, 0, 0), z_dir=(0, -1, 0))) as filete7_3_piece_9:
        with BuildLine():
            CenterArc((1 - FILETE7_R, FILETE7_R), FILETE7_R, 270, 90)
            Line((1 - FILETE7_R, 0), (1, 0))
            Line((1, 0), (1, FILETE7_R))
        make_face()
    revolve(axis=Axis((-355, 114, -539), (0, 0, 1)), revolution_arc=90, mode=Mode.SUBTRACT)
    with BuildSketch(Plane(origin=(-440, 16, -540), x_dir=(0, 0, 1), z_dir=(0, 1, 0))) as filete7_3_piece_10:
        with BuildLine():
            CenterArc((1 + FILETE7_R, FILETE7_R), FILETE7_R, 180, 90)
            Line((1, FILETE7_R), (1, 0))
            Line((1, 0), (1 + FILETE7_R, 0))
        make_face()
    revolve(axis=Axis((-440, 16, -540), (1, 0, 0)), revolution_arc=90, mode=Mode.SUBTRACT)

    # Esboço9 → Corte-extrusão4 (cut)
    with BuildSketch(Plane.XZ.offset(-3)):
        with Locations((-432.5, -432)):
            Circle(ESBO_O9_R)
        with Locations((-361.5, -432)):
            Circle(ESBO_O9_R)
        with Locations((-361.5, -548)):
            Circle(ESBO_O9_R)
        with Locations((-432.5, -548)):
            Circle(ESBO_O9_R)
    extrude(amount=-CORTE_EXTRUS_O4_DEPTH, mode=Mode.SUBTRACT)

    # Filete8
    filete8_edges = [part.edges().sort_by_distance(p)[0] for p in [
        (-434, 3, -432),
        (-363, 3, -432),
        (-363, 3, -548),
        (-434, 3, -548),
    ]]
    fillet(filete8_edges, radius=FILETE8_R)


solid = part.part
